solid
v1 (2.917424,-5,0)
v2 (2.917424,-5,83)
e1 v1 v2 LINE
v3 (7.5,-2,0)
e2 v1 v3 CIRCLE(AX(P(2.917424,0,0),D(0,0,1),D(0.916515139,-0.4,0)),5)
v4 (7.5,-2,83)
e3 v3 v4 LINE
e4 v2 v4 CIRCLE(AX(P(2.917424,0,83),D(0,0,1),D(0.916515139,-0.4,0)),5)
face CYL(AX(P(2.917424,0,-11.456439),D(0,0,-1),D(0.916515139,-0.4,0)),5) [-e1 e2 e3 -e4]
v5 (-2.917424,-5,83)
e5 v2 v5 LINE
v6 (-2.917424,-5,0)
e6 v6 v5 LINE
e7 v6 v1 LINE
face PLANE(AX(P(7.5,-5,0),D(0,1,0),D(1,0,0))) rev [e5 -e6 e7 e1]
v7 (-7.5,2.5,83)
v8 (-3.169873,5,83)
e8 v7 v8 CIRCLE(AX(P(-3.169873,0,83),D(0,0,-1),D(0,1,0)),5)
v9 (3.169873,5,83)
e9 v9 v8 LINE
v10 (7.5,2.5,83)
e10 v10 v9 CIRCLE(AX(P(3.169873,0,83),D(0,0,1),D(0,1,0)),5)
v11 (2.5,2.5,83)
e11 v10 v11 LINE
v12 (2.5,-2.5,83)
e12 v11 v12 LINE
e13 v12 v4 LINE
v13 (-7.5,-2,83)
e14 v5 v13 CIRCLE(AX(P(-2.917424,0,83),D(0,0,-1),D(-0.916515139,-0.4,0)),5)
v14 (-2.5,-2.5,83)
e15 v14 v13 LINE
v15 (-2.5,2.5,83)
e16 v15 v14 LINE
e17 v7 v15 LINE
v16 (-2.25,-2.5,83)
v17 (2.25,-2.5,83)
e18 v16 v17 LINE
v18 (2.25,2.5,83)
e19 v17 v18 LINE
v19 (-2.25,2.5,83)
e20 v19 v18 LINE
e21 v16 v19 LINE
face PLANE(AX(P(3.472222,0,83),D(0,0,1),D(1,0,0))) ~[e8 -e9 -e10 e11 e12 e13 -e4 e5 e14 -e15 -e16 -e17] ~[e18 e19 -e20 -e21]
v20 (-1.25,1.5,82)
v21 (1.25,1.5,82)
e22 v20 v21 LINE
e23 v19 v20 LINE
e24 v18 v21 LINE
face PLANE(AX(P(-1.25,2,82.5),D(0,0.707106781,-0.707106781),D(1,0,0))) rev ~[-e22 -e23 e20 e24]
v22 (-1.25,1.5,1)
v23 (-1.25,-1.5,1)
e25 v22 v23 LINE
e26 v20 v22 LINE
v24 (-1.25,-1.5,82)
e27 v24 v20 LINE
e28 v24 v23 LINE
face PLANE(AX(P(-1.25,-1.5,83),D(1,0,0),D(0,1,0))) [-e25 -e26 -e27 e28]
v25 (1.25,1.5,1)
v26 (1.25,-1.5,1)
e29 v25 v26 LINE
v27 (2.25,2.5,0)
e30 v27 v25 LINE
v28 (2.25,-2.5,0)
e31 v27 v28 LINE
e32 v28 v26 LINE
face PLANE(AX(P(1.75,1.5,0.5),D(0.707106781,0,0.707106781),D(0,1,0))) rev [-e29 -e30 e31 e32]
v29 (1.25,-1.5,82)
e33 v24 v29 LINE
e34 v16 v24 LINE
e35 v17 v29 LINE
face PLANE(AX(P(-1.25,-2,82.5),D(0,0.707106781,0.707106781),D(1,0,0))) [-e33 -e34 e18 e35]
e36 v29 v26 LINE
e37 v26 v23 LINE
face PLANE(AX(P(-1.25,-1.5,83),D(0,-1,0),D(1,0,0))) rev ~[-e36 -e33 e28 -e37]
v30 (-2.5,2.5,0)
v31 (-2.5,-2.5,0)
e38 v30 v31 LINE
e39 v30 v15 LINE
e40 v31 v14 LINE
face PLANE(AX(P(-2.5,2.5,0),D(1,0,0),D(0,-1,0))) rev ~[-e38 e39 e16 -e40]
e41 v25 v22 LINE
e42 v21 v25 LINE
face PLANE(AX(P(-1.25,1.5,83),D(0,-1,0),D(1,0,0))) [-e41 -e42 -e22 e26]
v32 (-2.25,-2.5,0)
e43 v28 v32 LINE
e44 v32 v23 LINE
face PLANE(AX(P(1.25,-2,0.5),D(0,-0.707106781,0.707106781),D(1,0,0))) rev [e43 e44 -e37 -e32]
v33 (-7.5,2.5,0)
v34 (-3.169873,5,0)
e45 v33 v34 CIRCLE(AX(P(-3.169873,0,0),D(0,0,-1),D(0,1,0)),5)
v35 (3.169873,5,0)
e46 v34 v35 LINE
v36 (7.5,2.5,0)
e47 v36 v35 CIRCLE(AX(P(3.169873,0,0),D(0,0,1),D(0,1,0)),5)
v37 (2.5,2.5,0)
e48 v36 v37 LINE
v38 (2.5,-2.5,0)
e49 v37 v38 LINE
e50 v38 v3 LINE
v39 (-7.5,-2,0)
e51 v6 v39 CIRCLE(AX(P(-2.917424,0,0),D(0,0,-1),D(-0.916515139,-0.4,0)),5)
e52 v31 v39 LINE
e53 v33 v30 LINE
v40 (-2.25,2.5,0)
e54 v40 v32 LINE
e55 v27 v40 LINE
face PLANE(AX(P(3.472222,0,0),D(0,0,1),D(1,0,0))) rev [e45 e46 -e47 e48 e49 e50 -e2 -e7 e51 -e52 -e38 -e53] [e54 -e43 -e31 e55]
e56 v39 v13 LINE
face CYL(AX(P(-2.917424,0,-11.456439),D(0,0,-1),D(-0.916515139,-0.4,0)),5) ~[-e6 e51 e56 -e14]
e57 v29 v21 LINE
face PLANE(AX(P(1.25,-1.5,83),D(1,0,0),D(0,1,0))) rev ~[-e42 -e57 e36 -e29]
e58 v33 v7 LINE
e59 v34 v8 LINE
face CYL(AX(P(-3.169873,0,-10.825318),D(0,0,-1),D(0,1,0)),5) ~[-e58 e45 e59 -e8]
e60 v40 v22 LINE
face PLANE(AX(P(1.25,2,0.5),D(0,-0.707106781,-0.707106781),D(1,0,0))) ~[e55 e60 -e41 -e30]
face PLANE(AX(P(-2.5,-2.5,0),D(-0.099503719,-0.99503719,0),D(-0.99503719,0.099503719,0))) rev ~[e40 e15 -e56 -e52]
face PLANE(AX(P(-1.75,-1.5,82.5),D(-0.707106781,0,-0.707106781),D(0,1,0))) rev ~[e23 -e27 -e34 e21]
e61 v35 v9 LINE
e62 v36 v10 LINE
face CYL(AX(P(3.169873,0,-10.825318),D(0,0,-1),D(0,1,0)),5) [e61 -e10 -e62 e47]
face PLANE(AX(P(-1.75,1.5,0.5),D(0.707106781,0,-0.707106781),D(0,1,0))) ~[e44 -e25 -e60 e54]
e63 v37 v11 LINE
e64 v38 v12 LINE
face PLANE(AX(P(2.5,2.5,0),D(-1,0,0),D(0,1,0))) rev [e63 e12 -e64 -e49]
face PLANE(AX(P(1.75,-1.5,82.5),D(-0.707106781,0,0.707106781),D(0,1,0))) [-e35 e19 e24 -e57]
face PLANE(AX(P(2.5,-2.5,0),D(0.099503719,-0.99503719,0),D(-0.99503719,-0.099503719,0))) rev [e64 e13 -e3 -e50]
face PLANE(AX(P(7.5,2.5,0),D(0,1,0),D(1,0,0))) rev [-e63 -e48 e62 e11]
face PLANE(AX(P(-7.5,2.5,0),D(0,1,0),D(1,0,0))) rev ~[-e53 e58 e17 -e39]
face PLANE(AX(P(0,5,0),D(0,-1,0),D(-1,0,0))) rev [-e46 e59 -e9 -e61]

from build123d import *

# Parameters (mm, degrees)
F1_DEPTH    = 83
F2_T1_DEPTH = 104.6506350946
F2_T3_DEPTH = 105.9128784748
F4_W        = 2.5
F4_H        = 3
F5_DEPTH    = 83.001
F6_SIZE     = 1


# Not quite as in the source:
# - a fillet or chamfer that OpenCascade refuses, or shapes differently, is made with other operations: its cross-section is extruded or revolved along the edge and cut away or added


with BuildPart() as f1:
    # F0 (on Top) → F1 (new body)
    with BuildSketch(Plane.XY):
        Polygon((0, -5), (0, 5), (-7.5, 5), (-7.5, 2.5), (-2.5, 2.5), (-2.5, -2.5), (-7.5, -2.5), (-7.5, -5), align=None)
        Polygon((-7.5, -2), (-7.5, -2.5), (-2.5, -2.5), align=None)
    extrude(amount=F1_DEPTH)

    # F2: fillet of radius 5 on 2 edges, made by hand

    # F2_s2 → F2_t1 (cut)
    with BuildSketch(Plane.XY.offset(-10.8253175473)):
        with BuildLine():
            ThreePointArc((-3.1698729811, 5), (-5.6698729811, 4.3301270189), (-7.5, 2.5))
            Line((-7.5, 2.5), (-7.5, 5))
            Line((-7.5, 5), (-3.1698729811, 5))
        make_face()
    extrude(amount=F2_T1_DEPTH, mode=Mode.SUBTRACT)

    # F2_s4 → F2_t3 (cut)
    with BuildSketch(Plane.XY.offset(-11.4564392374)):
        with BuildLine():
            ThreePointArc((-7.5, -2), (-5.6560370926, -4.1833001327), (-2.917424305, -5))
            Line((-2.917424305, -5), (-7.5, -5))
            Line((-7.5, -5), (-7.5, -2))
        make_face()
    extrude(amount=F2_T3_DEPTH, mode=Mode.SUBTRACT)

    # F3: F1 across face


with BuildPart() as f1_1:
    add(f1.part)
    add(f1.part.mirror(Plane(origin=(0, 0, 41.5), x_dir=(0, 1, 0), z_dir=(1, 0, 0))))

    # F4 (on face) → F5 (cut, through all)
    with BuildSketch(Plane.XY.offset(83)):
        Rectangle(F4_W, F4_H)
    extrude(amount=-F5_DEPTH, mode=Mode.SUBTRACT)

    # F6
    f6_edges = [f1_1.edges().sort_by_distance(p)[0] for p in [
        (1.25, 0, 83),
        (0, 1.5, 83),
        (-1.25, 0, 83),
        (0, -1.5, 83),
        (1.25, 0, 0),
        (0, -1.5, 0),
        (-1.25, 0, 0),
        (0, 1.5, 0),
    ]]
    chamfer(f6_edges, length=F6_SIZE)


solid = f1_1.part
